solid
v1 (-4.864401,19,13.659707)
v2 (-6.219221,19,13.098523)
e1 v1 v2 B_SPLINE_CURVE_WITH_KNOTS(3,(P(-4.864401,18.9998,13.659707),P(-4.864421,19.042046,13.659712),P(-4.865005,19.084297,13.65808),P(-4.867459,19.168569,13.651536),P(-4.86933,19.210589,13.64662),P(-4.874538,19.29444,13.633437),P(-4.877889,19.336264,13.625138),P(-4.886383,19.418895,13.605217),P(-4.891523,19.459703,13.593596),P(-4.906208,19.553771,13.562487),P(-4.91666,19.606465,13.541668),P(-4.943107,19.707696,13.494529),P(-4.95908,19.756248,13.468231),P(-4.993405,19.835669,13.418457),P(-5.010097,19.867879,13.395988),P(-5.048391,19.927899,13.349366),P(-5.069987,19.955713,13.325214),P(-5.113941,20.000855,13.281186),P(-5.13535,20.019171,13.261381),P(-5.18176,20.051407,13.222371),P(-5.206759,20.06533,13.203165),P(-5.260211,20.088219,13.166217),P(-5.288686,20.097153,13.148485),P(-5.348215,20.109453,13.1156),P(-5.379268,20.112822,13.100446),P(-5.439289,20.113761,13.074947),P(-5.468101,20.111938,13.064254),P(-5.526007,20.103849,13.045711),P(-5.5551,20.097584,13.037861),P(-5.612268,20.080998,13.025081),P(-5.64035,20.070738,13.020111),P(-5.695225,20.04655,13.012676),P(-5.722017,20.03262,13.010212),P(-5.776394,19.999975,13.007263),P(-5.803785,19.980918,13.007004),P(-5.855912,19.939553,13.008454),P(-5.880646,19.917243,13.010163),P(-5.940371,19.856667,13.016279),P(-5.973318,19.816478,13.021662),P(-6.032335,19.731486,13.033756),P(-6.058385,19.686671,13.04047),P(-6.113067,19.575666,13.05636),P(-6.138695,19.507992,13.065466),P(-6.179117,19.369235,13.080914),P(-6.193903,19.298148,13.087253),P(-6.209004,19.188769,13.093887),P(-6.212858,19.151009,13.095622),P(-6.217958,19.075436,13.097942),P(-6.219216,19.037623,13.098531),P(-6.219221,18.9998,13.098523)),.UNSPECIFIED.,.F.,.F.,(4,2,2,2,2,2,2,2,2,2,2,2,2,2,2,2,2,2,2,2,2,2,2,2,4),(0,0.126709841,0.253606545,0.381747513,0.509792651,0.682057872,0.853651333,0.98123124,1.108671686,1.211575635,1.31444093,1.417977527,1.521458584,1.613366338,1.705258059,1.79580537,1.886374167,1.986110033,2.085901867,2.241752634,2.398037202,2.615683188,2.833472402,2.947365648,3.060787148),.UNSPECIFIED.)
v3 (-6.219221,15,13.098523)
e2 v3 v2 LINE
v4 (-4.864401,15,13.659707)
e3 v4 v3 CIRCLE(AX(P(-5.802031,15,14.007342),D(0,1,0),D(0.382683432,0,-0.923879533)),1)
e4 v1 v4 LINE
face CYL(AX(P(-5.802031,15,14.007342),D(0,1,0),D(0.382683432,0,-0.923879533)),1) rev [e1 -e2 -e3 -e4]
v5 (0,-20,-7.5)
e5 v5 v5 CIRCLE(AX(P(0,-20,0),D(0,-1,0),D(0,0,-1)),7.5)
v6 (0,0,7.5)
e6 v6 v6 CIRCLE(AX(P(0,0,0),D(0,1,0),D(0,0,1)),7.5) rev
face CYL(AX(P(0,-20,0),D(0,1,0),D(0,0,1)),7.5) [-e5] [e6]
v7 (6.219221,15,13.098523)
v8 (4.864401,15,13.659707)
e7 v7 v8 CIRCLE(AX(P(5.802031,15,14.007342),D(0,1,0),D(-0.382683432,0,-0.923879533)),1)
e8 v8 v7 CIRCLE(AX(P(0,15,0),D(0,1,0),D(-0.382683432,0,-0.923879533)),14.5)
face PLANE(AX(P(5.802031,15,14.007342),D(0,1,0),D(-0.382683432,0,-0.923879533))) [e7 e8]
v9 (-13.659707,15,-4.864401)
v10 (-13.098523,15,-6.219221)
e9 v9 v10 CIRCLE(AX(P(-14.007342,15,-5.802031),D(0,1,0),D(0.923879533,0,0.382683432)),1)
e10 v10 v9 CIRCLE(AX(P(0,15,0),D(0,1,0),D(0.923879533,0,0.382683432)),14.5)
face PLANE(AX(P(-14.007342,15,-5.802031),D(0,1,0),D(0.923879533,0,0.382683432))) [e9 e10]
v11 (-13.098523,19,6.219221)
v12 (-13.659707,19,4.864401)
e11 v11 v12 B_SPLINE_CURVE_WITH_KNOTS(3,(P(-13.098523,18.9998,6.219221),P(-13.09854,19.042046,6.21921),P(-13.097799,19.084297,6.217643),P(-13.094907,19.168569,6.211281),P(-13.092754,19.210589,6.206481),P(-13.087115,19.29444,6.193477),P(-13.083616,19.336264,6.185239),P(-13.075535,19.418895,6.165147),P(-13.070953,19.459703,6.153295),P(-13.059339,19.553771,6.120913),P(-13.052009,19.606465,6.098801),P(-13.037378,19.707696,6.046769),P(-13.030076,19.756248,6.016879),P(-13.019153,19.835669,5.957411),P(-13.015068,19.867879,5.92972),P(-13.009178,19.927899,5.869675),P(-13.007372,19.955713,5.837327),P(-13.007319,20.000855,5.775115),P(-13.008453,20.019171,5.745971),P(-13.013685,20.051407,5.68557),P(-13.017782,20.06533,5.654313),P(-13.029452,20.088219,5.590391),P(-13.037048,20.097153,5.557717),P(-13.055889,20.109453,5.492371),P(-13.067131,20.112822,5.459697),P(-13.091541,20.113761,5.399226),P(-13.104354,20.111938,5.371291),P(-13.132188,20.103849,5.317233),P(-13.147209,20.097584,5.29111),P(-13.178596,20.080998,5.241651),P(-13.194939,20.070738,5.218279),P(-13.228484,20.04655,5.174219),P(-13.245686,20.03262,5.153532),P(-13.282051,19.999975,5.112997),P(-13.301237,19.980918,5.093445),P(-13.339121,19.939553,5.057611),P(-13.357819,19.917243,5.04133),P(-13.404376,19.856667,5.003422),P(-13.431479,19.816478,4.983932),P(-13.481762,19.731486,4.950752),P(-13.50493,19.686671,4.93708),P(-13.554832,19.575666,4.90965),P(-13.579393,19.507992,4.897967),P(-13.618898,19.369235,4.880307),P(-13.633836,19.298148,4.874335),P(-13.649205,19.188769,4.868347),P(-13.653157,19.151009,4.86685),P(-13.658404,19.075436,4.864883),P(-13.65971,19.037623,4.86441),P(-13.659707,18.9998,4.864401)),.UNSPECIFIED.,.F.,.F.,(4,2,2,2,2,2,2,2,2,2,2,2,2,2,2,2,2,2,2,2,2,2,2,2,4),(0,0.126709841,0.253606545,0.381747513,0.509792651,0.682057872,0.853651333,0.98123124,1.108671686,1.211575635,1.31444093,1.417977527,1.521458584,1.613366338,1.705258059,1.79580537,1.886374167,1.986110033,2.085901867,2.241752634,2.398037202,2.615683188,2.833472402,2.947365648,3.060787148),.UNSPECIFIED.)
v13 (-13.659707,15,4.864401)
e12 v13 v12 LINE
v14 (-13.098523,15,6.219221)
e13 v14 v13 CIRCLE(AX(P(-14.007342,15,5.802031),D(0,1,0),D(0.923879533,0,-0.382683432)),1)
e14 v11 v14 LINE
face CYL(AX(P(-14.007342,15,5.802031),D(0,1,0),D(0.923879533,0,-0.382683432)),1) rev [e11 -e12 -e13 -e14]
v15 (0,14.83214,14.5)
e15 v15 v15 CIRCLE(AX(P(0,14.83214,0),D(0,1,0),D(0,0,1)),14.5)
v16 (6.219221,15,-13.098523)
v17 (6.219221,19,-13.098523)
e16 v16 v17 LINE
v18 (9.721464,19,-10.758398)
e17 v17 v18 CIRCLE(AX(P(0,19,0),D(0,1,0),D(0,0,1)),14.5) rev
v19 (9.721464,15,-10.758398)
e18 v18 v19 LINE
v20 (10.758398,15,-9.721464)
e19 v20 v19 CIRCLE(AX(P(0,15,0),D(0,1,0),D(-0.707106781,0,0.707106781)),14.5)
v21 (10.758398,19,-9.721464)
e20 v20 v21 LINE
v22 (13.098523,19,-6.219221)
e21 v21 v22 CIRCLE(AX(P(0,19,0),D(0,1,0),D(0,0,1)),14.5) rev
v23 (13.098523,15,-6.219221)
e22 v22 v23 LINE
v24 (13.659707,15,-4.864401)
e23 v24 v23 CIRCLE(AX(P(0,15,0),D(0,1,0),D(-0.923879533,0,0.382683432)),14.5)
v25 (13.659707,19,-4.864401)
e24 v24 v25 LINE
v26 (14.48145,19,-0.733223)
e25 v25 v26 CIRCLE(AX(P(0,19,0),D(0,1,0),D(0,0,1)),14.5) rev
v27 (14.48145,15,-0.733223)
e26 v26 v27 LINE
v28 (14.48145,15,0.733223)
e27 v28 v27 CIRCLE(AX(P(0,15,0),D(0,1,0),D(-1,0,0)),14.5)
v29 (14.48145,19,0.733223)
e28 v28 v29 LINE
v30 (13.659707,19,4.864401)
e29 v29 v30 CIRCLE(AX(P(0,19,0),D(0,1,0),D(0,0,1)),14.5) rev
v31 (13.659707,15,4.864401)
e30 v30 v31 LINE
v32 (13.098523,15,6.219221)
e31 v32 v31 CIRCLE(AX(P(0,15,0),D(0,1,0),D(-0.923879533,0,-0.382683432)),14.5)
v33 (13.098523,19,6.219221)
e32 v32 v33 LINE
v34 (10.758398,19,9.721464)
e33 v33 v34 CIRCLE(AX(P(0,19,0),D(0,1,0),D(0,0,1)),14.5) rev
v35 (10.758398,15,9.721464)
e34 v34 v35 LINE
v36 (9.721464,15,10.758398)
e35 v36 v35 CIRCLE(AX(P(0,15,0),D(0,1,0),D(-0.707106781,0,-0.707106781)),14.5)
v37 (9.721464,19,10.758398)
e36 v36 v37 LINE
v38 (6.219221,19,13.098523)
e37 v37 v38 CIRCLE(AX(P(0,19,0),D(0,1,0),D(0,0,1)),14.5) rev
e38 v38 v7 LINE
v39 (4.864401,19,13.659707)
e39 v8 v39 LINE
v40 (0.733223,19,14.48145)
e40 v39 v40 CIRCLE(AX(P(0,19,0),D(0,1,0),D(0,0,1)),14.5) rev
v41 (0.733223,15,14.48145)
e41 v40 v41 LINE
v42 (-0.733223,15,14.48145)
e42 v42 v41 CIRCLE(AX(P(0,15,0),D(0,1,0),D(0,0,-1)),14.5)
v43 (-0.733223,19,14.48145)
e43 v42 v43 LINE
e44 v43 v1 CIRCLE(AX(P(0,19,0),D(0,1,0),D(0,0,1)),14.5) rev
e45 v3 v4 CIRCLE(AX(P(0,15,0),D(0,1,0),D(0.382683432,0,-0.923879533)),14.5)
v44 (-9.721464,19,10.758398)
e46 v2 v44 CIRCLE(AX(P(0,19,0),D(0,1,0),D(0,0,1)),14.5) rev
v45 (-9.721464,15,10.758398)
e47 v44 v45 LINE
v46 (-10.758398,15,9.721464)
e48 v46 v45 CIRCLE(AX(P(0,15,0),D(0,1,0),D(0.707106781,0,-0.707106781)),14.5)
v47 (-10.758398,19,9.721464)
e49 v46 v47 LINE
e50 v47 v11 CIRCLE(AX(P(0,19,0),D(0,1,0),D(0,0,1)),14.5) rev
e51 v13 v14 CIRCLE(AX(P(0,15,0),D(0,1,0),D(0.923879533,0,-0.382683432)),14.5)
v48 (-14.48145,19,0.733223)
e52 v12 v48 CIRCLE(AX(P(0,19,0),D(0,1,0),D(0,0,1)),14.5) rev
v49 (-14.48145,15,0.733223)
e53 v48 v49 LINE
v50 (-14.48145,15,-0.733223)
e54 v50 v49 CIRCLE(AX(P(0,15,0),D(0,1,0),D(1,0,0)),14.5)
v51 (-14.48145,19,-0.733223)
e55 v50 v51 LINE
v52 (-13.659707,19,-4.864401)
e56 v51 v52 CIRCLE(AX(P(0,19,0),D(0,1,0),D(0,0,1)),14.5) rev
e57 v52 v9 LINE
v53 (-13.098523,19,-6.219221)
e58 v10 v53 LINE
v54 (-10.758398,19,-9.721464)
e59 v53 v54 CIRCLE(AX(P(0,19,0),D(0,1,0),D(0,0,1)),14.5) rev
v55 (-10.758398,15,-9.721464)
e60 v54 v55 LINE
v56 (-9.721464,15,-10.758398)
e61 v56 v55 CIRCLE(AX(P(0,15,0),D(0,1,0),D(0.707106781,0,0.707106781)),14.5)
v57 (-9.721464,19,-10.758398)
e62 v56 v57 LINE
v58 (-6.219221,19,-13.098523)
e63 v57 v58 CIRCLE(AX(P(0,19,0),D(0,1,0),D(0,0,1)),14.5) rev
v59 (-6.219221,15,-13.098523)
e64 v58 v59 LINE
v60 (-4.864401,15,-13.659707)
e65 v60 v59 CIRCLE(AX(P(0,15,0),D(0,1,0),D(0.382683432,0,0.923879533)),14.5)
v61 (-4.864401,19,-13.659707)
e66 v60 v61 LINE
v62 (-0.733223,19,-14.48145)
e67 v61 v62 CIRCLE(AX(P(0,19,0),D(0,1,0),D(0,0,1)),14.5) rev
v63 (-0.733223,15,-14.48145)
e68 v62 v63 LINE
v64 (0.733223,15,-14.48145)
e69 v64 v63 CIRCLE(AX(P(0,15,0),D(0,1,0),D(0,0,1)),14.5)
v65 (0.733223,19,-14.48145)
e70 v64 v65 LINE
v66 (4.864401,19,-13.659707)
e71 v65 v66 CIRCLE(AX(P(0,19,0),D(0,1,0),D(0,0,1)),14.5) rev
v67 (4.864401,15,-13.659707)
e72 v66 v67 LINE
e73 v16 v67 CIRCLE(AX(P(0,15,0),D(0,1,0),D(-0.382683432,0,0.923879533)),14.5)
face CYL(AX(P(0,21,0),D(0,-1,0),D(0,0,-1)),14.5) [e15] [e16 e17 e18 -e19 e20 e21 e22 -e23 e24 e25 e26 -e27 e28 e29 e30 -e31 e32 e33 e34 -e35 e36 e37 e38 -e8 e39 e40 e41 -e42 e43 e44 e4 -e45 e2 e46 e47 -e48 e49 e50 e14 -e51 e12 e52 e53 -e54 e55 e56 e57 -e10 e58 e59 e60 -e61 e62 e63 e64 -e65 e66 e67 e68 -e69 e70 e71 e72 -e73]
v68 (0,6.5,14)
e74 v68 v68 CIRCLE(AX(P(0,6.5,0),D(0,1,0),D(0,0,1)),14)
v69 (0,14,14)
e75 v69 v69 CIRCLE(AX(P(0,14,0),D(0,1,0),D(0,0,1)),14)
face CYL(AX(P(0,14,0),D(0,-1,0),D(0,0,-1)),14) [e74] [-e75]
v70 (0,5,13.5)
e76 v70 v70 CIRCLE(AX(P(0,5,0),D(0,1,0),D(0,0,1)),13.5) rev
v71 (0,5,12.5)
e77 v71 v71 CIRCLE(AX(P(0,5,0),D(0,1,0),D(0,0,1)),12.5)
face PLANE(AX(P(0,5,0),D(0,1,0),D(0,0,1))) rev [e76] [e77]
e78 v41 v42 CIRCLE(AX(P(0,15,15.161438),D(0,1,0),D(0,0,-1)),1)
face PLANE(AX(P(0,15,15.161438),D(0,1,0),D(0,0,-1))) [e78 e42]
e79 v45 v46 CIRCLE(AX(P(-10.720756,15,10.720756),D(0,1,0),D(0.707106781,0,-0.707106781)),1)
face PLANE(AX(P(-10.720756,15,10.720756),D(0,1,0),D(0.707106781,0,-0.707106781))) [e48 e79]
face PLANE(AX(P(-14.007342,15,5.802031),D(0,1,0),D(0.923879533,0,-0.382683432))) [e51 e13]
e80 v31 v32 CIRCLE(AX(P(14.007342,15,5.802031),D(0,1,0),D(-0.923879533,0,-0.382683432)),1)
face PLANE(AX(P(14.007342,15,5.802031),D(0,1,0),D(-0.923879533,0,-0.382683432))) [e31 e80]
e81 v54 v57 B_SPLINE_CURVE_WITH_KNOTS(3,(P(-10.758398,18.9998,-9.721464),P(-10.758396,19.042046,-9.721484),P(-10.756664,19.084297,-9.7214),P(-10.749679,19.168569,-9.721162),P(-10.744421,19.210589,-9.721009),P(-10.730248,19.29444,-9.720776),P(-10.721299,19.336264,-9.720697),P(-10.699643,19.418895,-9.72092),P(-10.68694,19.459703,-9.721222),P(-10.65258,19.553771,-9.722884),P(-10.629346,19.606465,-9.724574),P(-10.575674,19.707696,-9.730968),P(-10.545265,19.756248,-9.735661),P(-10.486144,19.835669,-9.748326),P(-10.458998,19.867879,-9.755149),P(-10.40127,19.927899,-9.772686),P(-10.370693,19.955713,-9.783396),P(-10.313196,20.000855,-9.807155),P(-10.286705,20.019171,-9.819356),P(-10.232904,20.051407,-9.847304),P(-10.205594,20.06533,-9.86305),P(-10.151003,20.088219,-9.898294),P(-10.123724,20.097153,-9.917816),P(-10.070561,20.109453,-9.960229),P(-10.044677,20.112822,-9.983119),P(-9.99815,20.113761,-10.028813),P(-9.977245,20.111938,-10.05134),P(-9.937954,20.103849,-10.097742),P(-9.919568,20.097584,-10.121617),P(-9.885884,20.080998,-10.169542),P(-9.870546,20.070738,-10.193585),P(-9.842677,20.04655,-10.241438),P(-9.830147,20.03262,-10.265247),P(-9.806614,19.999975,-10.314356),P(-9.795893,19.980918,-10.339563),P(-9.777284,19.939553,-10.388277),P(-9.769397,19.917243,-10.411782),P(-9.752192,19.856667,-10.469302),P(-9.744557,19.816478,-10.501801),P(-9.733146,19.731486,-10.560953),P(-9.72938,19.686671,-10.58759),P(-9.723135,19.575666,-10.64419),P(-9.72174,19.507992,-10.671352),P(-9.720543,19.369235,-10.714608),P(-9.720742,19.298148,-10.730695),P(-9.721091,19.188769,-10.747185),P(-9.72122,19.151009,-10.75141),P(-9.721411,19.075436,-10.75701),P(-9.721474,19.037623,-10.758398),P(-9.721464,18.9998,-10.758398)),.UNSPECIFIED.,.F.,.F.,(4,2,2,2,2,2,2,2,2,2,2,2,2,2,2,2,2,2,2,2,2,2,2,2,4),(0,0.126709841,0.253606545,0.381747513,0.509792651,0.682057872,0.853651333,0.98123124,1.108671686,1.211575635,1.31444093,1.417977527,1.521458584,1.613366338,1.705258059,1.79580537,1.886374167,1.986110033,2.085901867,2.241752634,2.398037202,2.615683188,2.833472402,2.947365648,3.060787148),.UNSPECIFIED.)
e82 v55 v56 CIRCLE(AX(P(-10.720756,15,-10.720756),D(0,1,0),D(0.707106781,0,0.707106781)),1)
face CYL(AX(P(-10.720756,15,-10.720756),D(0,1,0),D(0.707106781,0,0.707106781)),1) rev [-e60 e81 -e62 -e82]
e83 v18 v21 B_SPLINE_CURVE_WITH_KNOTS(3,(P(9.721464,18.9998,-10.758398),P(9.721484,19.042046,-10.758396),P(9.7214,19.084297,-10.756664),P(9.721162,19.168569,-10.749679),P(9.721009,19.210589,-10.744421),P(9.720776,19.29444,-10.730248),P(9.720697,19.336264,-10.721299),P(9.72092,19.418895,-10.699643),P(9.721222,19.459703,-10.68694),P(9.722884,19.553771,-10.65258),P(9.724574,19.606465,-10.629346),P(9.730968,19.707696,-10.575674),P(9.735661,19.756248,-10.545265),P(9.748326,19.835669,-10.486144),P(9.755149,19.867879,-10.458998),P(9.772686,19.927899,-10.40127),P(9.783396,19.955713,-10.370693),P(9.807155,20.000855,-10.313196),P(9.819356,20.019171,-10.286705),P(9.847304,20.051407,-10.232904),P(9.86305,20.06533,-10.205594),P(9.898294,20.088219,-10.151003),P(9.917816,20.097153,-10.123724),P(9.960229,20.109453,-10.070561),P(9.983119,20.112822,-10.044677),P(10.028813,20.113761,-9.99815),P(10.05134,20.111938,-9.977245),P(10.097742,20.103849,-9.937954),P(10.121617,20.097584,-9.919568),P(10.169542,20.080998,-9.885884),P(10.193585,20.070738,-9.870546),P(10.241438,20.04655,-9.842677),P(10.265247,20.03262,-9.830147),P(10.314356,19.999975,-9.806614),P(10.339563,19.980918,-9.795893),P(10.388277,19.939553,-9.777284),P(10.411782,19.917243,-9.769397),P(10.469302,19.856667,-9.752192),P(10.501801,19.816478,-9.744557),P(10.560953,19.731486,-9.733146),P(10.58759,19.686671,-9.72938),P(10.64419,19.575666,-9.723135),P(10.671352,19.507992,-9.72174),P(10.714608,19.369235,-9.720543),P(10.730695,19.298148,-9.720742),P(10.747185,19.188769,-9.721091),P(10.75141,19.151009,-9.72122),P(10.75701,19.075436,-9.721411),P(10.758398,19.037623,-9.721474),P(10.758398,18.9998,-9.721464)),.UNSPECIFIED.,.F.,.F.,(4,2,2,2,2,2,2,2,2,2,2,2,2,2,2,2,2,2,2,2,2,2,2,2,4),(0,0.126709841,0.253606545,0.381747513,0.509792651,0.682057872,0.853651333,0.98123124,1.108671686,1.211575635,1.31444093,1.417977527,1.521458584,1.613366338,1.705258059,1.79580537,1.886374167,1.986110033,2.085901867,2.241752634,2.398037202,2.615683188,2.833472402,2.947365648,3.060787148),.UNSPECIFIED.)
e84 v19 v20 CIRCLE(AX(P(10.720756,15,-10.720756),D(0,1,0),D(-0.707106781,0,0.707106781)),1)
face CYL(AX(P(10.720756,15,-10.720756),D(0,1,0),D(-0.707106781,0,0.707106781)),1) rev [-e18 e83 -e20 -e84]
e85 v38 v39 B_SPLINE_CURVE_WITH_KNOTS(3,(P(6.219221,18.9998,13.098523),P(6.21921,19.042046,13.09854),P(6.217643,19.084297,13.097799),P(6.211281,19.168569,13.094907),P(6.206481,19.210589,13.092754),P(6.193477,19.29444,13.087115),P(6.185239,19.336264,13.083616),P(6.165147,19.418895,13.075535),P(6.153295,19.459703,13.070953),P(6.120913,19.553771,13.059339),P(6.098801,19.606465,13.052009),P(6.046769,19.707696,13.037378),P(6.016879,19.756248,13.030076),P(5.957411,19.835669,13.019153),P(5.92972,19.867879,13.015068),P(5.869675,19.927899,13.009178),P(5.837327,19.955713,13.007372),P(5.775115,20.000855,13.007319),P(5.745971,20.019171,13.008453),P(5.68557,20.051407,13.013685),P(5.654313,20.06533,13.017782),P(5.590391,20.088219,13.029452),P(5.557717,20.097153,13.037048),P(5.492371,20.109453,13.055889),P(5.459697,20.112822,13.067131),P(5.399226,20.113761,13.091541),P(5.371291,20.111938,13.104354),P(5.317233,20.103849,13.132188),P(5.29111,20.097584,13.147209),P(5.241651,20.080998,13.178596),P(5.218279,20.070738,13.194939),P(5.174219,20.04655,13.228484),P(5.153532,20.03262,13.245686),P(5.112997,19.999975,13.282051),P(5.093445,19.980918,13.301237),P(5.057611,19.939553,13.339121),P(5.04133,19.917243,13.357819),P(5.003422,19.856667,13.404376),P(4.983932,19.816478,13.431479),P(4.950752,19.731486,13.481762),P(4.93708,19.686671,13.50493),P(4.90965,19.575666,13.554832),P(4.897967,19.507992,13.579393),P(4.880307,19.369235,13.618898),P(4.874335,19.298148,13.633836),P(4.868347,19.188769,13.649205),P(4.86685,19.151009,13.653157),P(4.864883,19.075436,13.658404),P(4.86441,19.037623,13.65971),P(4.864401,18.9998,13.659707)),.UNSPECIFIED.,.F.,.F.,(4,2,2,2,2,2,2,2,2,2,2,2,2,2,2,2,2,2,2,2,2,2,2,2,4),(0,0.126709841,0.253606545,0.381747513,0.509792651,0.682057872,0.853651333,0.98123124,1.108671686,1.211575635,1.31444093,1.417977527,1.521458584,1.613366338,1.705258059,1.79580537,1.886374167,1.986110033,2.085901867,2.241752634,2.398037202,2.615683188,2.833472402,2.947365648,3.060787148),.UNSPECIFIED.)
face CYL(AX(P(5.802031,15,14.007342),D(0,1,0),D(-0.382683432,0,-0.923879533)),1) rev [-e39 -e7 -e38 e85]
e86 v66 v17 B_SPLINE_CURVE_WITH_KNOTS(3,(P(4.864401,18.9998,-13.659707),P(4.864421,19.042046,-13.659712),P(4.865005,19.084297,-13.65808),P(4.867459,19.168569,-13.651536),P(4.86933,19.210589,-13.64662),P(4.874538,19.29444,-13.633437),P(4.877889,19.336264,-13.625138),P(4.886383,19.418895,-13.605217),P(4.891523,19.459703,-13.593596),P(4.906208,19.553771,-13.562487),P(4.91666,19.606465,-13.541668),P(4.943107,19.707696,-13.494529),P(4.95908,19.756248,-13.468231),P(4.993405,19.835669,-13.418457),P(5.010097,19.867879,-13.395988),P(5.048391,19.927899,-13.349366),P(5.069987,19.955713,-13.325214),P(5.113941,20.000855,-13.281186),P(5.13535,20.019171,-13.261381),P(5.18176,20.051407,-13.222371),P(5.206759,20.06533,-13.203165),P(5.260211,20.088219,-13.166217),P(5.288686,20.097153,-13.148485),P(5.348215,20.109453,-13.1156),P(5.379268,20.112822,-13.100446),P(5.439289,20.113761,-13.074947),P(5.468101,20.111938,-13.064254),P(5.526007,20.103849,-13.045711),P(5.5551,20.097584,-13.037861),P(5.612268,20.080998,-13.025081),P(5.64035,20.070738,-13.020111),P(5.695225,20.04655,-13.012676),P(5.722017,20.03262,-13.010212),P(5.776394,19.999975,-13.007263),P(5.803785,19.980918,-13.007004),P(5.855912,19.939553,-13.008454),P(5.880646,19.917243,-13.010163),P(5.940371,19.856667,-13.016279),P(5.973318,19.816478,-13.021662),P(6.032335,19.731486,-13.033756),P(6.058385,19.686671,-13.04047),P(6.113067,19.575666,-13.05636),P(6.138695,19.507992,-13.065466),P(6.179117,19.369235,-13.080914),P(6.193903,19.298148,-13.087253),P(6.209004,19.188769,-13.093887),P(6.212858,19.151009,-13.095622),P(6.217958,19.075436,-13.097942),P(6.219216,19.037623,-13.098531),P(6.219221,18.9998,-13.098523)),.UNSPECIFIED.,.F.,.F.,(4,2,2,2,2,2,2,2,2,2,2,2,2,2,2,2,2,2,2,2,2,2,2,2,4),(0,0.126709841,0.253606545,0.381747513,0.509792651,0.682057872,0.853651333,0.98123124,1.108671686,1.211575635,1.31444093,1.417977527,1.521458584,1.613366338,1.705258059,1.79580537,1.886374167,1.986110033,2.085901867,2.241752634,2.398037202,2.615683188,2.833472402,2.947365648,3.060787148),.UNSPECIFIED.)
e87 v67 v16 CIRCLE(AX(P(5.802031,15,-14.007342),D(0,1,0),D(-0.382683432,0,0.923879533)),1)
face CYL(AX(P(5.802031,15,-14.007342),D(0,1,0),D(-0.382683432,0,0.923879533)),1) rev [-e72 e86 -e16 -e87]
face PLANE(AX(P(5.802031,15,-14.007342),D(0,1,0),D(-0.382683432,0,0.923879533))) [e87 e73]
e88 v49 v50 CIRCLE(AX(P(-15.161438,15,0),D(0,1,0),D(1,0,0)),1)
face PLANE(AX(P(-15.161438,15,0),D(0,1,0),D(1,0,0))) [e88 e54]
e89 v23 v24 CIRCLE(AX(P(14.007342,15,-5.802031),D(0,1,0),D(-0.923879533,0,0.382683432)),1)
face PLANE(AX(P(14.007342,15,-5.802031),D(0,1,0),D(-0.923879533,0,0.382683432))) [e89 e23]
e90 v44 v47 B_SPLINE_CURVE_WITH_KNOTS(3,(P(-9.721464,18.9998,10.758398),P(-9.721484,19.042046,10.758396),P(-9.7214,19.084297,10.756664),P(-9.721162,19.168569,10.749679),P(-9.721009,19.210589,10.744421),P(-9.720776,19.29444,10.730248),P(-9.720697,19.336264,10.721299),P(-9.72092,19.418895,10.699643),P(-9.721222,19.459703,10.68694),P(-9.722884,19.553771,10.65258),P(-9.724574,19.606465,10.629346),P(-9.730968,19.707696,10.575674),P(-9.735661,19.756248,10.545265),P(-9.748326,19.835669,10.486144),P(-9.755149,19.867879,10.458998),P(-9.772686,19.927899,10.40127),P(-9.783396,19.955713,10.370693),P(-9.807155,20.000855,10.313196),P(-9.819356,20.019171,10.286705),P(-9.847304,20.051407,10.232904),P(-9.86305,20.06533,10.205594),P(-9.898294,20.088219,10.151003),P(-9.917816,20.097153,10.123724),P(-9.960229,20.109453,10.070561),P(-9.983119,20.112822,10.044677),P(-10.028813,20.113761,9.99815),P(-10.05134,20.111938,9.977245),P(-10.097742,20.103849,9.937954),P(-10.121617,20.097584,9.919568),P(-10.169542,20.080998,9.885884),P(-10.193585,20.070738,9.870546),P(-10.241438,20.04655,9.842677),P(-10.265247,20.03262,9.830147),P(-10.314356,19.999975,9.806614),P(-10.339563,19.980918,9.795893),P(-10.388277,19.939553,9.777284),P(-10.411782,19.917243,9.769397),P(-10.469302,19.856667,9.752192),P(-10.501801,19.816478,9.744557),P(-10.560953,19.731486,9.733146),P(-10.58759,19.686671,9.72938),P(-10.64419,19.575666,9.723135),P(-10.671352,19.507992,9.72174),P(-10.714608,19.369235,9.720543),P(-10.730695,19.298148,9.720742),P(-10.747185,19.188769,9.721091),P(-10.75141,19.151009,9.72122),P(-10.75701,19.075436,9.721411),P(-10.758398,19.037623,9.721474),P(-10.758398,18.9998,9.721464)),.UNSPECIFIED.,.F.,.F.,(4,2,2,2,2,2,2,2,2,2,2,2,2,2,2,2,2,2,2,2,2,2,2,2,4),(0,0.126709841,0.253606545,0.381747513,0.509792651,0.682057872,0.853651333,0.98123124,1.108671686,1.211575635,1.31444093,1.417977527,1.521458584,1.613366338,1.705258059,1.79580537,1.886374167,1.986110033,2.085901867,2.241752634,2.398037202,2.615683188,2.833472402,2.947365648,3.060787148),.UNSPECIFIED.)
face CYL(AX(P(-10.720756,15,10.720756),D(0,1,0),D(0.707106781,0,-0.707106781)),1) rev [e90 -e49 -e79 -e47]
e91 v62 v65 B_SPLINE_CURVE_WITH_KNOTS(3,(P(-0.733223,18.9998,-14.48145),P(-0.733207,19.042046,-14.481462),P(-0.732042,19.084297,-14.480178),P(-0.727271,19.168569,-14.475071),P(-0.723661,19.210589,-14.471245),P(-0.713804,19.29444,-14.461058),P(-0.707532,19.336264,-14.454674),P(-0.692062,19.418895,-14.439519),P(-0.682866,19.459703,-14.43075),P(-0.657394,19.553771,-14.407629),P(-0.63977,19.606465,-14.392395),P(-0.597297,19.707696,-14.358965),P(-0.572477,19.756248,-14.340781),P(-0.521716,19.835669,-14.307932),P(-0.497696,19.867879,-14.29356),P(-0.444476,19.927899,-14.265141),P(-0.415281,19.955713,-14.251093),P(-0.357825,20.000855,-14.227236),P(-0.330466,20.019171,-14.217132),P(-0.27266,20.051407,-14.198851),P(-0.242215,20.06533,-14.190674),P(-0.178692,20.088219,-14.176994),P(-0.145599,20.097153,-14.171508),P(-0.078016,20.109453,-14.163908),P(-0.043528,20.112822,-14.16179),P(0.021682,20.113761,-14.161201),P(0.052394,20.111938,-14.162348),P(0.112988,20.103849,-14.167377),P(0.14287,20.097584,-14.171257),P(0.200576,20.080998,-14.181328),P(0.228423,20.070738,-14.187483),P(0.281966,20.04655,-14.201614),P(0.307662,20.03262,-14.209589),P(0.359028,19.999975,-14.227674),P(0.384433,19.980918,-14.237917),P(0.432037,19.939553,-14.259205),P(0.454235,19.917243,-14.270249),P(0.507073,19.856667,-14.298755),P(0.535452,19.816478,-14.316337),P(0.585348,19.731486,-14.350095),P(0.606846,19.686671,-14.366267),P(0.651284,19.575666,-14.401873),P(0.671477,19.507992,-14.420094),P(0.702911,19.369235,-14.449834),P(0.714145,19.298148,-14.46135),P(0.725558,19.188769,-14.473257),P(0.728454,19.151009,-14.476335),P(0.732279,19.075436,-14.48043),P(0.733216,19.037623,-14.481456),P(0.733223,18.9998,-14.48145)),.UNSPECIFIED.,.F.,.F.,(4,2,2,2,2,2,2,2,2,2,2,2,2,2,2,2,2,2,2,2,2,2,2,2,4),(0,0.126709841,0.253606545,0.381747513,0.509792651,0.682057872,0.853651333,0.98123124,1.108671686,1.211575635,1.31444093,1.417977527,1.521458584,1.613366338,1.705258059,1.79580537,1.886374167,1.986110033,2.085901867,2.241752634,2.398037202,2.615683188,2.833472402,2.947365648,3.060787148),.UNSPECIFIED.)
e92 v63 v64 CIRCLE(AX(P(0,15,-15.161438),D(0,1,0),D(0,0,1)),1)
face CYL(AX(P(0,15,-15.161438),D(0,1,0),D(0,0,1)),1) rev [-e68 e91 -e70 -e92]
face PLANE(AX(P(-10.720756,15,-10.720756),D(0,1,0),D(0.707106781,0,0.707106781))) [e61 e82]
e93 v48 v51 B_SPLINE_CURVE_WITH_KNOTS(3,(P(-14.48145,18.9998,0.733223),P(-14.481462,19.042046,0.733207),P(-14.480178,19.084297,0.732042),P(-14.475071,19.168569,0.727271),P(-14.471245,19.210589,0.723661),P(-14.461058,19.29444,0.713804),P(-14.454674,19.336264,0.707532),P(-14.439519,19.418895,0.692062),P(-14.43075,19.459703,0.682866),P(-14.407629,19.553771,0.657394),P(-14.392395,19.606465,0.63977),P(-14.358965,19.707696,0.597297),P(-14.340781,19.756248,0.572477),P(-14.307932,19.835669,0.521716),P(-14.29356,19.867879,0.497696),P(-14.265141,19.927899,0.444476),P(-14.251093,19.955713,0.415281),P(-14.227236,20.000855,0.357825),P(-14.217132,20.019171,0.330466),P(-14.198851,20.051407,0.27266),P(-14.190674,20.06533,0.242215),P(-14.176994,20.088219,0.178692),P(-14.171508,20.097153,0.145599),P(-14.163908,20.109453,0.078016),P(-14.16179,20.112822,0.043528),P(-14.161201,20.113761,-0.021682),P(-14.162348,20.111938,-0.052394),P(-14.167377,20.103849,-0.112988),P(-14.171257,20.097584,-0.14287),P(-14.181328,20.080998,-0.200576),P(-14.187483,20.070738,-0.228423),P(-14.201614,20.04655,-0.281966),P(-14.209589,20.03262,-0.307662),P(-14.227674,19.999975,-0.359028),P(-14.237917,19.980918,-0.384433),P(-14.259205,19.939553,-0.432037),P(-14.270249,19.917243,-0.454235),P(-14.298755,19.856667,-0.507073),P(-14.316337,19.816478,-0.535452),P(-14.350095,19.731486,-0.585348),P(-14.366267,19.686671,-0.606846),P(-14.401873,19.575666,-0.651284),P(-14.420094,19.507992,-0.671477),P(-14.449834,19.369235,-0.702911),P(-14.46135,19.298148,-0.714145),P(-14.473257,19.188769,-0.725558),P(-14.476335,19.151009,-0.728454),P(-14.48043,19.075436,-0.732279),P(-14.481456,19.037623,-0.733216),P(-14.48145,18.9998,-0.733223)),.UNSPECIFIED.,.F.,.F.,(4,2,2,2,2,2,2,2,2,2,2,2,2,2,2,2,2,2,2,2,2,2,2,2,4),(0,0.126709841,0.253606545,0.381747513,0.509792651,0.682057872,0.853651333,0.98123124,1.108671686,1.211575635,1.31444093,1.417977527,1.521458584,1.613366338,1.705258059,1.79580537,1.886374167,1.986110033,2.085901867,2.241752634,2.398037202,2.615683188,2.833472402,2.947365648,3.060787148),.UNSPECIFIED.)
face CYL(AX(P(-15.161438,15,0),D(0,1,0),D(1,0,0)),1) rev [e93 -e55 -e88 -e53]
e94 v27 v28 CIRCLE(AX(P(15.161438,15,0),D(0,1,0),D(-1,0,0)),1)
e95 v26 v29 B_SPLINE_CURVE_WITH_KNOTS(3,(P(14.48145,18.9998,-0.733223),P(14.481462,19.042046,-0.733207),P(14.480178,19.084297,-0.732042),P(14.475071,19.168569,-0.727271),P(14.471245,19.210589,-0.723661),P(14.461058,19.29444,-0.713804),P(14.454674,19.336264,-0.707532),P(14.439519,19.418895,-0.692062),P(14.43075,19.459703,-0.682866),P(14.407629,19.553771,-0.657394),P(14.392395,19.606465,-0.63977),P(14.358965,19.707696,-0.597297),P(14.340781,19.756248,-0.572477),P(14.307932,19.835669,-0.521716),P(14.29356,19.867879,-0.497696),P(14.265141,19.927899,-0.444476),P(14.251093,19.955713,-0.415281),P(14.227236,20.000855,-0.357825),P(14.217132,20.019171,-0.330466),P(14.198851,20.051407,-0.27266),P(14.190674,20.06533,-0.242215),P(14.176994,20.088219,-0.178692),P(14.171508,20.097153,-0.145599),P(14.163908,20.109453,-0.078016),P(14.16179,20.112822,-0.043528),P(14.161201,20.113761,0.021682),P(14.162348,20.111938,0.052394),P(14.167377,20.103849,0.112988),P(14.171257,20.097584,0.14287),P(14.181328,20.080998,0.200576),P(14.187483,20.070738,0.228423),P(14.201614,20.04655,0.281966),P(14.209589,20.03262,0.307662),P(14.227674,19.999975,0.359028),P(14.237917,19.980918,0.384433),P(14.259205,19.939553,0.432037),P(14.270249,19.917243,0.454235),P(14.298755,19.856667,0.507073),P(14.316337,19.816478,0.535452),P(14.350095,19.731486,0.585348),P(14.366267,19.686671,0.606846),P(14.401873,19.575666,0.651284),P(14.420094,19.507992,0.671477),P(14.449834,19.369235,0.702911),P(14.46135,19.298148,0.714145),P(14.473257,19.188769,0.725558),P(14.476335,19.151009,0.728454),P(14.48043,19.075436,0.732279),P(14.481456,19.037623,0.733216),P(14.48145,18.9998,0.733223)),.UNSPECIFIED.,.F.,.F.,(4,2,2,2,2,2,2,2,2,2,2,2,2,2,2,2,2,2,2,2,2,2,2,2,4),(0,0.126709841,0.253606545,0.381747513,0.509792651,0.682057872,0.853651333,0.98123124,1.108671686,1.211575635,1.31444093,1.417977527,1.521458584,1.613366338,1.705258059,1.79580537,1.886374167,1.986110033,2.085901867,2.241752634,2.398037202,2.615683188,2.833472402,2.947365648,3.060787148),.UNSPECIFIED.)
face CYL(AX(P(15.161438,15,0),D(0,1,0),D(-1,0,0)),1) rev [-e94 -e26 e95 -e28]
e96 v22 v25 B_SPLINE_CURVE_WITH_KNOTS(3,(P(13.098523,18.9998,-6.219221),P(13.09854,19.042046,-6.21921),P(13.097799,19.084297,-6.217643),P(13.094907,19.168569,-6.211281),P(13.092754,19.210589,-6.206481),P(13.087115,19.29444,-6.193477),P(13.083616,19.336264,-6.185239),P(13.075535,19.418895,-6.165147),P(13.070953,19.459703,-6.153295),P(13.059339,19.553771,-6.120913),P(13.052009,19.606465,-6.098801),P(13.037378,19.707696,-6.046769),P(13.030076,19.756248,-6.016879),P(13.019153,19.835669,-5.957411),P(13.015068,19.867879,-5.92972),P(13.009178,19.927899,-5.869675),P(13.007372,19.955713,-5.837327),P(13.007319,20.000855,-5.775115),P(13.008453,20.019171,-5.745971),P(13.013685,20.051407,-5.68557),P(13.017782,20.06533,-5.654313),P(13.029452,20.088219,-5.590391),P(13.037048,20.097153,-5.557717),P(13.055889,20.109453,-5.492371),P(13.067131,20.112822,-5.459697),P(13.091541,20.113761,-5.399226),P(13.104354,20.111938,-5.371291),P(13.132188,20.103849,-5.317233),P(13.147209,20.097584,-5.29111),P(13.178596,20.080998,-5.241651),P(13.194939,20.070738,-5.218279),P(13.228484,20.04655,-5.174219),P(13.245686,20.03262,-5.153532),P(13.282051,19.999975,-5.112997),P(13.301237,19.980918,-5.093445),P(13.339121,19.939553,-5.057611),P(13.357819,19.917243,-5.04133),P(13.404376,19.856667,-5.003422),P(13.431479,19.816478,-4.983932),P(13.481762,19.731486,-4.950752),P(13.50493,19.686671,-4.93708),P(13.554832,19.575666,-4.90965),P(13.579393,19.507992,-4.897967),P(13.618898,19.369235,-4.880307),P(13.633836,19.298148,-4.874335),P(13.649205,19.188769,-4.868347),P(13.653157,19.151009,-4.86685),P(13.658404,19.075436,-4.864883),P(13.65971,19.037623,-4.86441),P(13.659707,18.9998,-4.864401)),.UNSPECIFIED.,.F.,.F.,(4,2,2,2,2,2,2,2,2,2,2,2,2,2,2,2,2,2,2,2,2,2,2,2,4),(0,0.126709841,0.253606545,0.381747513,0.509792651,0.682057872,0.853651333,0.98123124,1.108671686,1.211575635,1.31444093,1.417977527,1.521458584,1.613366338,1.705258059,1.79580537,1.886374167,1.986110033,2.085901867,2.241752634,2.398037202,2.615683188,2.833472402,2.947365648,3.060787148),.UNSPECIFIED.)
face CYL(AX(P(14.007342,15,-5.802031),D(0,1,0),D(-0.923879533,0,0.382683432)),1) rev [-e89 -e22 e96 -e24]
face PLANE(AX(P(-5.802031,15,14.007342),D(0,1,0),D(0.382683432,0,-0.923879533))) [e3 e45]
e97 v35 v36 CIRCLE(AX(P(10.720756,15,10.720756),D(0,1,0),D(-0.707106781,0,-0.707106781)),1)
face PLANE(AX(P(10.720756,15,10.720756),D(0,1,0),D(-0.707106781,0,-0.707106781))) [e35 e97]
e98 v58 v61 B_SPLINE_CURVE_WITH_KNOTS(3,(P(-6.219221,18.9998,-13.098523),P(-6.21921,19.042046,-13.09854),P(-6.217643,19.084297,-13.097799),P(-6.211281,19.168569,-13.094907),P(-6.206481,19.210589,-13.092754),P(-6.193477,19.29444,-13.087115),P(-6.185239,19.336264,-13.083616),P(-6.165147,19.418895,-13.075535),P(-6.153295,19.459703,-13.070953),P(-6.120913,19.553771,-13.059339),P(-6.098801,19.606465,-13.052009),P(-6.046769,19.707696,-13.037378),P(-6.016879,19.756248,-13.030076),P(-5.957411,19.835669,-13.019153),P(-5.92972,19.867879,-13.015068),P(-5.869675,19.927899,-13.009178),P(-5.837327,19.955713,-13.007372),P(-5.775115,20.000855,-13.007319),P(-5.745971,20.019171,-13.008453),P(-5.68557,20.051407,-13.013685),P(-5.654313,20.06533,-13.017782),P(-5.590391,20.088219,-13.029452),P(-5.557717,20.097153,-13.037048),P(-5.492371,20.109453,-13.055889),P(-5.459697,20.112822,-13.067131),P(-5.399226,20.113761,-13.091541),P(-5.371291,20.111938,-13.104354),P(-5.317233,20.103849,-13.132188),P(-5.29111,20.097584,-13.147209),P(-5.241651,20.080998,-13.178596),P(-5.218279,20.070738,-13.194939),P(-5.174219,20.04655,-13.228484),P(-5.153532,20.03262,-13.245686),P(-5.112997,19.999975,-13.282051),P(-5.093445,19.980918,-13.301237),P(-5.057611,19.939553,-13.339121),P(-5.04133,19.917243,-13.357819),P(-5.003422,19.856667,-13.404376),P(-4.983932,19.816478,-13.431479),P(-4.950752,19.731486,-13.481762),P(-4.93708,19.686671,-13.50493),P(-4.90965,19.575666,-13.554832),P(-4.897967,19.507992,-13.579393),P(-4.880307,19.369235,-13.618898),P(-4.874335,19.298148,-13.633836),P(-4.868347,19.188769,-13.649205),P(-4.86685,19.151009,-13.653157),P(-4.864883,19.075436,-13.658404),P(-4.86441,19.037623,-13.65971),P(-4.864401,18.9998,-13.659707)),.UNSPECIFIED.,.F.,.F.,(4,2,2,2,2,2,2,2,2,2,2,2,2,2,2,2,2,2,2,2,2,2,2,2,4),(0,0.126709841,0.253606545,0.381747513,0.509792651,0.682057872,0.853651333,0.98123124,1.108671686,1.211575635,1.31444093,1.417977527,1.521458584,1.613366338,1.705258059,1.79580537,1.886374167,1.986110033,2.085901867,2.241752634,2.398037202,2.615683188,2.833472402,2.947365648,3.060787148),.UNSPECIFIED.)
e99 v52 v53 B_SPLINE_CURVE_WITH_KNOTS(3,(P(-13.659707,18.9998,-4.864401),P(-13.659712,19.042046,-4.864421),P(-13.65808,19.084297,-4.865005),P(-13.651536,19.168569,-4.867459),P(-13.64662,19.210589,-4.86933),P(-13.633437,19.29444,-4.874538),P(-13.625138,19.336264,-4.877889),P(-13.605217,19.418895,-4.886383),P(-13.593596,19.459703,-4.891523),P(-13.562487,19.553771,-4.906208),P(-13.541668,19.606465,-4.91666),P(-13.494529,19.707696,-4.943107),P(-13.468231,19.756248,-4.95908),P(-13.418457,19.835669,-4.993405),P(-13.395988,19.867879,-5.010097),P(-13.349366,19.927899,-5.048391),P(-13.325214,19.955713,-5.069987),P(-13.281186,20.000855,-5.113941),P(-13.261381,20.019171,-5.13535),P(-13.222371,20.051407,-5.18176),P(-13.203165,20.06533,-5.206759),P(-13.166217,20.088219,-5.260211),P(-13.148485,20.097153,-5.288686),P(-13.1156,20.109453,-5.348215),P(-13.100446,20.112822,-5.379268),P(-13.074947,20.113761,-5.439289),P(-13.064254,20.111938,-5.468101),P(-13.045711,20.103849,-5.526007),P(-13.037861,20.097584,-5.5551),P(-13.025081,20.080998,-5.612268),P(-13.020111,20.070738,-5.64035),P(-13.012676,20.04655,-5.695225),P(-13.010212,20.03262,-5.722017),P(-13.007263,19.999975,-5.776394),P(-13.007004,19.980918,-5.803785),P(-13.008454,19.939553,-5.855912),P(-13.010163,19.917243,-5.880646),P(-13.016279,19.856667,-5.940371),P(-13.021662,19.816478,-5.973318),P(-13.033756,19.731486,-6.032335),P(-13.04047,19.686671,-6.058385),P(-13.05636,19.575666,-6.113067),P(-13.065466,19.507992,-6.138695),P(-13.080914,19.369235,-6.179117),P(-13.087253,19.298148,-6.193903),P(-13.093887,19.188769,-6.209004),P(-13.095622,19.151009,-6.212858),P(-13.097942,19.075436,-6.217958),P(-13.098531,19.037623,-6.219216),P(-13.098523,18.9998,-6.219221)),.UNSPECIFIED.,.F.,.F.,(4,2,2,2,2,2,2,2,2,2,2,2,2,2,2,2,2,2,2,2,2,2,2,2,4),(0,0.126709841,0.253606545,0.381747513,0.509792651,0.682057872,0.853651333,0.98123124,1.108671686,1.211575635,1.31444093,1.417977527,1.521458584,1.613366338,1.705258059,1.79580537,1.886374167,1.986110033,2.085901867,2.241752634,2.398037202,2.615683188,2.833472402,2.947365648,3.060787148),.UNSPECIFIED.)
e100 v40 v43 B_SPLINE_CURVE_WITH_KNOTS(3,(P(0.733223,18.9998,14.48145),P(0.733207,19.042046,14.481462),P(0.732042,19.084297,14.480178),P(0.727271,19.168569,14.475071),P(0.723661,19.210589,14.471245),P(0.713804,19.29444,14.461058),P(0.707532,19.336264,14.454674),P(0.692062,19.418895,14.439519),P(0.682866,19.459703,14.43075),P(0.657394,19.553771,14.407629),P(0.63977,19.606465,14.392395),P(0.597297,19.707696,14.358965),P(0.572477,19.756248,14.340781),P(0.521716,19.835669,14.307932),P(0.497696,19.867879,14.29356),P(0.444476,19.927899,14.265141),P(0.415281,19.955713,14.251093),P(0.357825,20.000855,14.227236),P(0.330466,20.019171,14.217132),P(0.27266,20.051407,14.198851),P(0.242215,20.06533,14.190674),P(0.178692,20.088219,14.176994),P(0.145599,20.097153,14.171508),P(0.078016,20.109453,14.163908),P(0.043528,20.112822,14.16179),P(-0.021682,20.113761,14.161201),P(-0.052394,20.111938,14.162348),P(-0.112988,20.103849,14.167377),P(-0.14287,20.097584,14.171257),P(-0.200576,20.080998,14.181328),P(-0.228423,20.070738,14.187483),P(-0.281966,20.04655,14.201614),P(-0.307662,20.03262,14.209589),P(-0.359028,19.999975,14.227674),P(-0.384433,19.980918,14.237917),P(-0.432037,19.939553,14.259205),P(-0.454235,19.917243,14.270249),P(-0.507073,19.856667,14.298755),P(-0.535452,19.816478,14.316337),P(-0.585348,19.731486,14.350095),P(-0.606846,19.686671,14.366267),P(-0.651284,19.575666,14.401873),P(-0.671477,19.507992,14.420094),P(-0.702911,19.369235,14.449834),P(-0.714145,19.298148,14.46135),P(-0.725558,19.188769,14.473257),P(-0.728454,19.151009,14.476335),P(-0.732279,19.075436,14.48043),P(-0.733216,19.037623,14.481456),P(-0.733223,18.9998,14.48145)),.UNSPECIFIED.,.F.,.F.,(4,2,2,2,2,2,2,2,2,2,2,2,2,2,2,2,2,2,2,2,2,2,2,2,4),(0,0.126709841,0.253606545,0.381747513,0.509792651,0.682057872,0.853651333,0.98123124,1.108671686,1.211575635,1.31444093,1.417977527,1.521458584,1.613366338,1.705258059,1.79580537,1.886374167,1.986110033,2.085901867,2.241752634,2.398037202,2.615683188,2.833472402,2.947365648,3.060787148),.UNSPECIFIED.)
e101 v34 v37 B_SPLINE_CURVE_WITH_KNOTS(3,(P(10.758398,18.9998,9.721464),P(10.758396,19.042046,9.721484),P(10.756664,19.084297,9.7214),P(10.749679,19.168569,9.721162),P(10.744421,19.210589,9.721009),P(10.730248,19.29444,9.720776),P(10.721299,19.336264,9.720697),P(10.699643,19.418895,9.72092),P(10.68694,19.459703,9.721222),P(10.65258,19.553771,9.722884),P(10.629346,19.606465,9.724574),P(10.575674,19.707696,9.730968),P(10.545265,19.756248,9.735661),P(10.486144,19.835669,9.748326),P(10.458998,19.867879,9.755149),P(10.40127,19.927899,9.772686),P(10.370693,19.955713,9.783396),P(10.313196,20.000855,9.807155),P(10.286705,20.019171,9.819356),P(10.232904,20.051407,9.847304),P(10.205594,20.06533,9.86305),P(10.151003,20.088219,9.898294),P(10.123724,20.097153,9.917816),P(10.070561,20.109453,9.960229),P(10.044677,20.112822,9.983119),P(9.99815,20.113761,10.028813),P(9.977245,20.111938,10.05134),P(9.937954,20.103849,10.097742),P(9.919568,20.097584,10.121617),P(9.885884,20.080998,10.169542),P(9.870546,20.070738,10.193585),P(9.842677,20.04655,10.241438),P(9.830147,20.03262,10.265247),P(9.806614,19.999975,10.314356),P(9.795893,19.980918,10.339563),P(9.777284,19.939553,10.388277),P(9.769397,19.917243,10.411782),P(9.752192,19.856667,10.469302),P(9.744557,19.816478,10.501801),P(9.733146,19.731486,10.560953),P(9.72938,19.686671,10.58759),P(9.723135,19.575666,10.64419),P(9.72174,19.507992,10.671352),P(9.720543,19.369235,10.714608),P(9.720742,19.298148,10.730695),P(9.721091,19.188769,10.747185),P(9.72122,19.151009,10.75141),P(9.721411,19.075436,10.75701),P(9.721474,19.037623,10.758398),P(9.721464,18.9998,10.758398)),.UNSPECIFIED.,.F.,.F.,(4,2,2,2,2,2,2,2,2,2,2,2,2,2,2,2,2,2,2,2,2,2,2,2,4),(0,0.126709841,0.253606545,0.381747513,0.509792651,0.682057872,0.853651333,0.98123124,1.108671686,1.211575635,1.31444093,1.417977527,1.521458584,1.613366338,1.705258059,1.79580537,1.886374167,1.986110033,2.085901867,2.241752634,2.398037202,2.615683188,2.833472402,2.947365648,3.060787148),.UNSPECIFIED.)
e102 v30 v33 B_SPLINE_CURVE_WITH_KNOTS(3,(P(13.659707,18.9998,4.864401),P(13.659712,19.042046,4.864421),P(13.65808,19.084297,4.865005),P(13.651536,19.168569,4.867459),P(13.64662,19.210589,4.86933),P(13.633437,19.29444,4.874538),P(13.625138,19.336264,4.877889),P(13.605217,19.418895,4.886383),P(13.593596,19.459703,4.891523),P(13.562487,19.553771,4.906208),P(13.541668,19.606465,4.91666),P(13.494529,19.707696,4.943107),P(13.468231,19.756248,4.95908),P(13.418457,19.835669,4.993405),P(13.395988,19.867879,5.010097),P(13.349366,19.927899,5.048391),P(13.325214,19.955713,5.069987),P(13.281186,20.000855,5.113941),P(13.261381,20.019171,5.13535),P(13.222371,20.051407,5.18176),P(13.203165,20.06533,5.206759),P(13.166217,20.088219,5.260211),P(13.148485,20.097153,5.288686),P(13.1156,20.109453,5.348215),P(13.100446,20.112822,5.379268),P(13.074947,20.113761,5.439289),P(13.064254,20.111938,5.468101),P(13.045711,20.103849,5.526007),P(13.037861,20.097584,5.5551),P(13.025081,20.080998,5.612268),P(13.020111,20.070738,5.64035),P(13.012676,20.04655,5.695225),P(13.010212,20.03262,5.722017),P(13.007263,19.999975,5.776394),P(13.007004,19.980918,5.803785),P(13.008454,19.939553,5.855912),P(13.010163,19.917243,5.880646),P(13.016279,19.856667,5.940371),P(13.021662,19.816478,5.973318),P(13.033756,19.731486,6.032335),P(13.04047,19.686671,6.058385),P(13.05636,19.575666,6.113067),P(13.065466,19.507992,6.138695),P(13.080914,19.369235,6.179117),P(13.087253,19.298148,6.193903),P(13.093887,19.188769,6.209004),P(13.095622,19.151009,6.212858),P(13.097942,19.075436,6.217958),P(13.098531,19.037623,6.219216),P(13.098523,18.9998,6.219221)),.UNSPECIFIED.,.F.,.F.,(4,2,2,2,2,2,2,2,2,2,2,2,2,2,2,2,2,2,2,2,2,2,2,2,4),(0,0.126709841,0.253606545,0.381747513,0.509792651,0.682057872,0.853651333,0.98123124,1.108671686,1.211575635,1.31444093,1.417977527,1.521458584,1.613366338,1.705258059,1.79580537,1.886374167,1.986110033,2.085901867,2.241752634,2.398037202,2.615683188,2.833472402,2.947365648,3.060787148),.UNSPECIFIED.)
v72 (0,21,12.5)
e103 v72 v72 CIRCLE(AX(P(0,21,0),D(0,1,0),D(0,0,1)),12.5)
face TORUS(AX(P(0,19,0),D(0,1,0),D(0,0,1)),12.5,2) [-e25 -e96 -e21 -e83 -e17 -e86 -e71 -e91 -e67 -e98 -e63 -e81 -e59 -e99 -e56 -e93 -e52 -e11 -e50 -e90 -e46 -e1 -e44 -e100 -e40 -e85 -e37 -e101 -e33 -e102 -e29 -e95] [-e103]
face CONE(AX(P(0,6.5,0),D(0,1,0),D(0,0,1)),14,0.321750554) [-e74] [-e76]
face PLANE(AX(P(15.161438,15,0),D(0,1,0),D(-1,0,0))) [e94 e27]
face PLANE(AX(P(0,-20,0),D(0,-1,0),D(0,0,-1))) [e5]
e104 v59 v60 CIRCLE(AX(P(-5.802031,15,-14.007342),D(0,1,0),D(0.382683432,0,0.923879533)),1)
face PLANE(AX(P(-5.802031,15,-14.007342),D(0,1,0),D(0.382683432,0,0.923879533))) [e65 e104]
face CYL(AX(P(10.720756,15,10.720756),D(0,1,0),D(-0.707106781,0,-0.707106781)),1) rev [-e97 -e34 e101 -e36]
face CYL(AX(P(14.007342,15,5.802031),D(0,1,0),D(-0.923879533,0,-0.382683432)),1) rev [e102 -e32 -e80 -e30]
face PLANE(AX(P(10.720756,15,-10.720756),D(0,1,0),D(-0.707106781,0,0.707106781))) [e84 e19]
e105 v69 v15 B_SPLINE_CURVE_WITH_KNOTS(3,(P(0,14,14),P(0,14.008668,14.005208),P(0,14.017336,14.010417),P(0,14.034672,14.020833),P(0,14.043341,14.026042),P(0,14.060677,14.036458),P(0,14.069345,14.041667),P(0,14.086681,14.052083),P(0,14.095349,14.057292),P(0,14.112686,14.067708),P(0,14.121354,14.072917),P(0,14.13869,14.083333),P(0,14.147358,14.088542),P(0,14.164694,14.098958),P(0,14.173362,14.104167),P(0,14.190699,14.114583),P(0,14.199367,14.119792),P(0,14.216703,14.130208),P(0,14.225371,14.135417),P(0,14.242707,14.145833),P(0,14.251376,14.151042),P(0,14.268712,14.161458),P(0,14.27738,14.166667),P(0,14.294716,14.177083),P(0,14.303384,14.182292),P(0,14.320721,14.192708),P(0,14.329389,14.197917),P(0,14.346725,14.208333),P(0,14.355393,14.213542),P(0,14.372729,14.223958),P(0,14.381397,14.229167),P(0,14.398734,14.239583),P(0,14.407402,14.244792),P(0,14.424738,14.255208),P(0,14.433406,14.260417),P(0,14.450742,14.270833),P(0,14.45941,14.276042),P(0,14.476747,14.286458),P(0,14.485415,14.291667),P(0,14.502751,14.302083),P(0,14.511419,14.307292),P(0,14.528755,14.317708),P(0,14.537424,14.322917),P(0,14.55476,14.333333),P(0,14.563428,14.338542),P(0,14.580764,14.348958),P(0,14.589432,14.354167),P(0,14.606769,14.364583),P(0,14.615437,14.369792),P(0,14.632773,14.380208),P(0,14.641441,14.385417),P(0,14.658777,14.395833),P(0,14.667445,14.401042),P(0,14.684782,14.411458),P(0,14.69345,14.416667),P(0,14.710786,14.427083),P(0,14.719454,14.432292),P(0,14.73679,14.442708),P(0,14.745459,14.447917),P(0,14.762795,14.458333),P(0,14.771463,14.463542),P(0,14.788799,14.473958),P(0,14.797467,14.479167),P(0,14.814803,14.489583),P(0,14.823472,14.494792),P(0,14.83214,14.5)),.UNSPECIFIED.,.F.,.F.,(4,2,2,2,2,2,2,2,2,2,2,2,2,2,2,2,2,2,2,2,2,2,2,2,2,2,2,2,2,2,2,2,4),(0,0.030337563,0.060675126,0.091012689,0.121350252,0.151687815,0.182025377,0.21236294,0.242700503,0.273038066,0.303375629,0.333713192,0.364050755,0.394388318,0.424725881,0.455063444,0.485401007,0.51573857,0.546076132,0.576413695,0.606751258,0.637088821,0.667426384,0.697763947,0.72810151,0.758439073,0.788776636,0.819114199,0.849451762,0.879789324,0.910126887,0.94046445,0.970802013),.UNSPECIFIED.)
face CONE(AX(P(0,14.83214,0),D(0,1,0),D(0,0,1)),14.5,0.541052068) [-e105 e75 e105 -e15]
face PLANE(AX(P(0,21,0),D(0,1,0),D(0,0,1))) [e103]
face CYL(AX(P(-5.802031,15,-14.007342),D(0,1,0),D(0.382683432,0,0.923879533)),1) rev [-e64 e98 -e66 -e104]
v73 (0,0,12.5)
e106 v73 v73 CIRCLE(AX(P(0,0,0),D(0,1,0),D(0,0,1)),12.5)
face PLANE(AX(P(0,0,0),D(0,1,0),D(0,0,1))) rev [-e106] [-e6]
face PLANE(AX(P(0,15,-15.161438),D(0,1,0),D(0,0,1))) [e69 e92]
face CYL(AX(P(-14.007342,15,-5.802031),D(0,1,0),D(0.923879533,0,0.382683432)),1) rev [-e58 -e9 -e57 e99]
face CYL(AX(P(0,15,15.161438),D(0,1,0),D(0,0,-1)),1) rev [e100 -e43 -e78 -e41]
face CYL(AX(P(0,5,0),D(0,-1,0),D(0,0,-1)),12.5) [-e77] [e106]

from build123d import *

# Parameters (mm, degrees)
SKETCH1_R           = 12.5
BOSS_EXTRUDE1_DEPTH = 5
SKETCH2_R           = 7.5
BOSS_EXTRUDE2_DEPTH = 20
SKETCH3_R           = 14
BOSS_EXTRUDE3_DEPTH = 9
CHAMFER1_SIZE       = 0.5
CHAMFER1_SIZE2      = 1.5
SKETCH4_R           = 14.5
BOSS_EXTRUDE4_DEPTH = 7
FILLET3_R           = 2
CHAMFER2_SIZE2      = 0.5
CHAMFER2_SIZE       = 0.832139741
CUT_EXTRUDE2_DEPTH  = 6
CIRPATTERN1_COUNT   = 16


with BuildPart() as part:
    # Sketch1 → Boss-Extrude1 (new body)
    with BuildSketch(Plane(origin=(0, 0, 0), x_dir=(1, 0, 0), z_dir=(0, 1, 0))):
        with Locations(Location((0, 0, 0), (0, 0, 270))):
            Circle(SKETCH1_R)
    extrude(amount=BOSS_EXTRUDE1_DEPTH)

    # Sketch2 → Boss-Extrude2 (add)
    with BuildSketch(Plane.XZ):
        with Locations(Location((0, 0, 0), (0, 0, 90))):
            Circle(SKETCH2_R)
    extrude(amount=BOSS_EXTRUDE2_DEPTH)

    # Sketch3 → Boss-Extrude3 (add)
    with BuildSketch(Plane(origin=(0, 5, 0), x_dir=(1, 0, 0), z_dir=(0, 1, 0))):
        with Locations(Location((0, 0, 0), (0, 0, 270))):
            Circle(SKETCH3_R)
    extrude(amount=BOSS_EXTRUDE3_DEPTH)

    # Chamfer1
    chamfer1_edges = [part.edges().sort_by_distance(p)[0] for p in [
        (0, 5, -14),
    ]]
    chamfer1_side = [part.faces().sort_by_distance(p)[0] for p in [
        (0, 5, -13.604020203),
    ]]
    chamfer(chamfer1_edges, length=CHAMFER1_SIZE, length2=CHAMFER1_SIZE2, reference=chamfer1_side[0])

    # Sketch4 → Boss-Extrude4 (add)
    with BuildSketch(Plane(origin=(0, 14, 0), x_dir=(1, 0, 0), z_dir=(0, 1, 0))):
        with Locations(Location((0, 0, 0), (0, 0, 270))):
            Circle(SKETCH4_R)
    extrude(amount=BOSS_EXTRUDE4_DEPTH)

    # Fillet3
    fillet3_edges = [part.edges().sort_by_distance(p)[0] for p in [
        (0, 21, -14.5),
    ]]
    fillet(fillet3_edges, radius=FILLET3_R)

    # Chamfer2
    chamfer2_edges = [part.edges().sort_by_distance(p)[0] for p in [
        (0, 14, -14.5),
    ]]
    chamfer2_side = [part.faces().sort_by_distance(p)[0] for p in [
        (0, 14.01, -14.5),
    ]]
    chamfer(chamfer2_edges, length=CHAMFER2_SIZE - 0.0001, length2=CHAMFER2_SIZE2 - 0.0001, reference=chamfer2_side[0])  # a hair under: the kernel refuses the full size

    # Sketch5 → Cut-Extrude2 (cut)
    with BuildSketch(Plane(origin=(0, 21, 0), x_dir=(1, 0, 0), z_dir=(0, 1, 0))):
        with BuildLine():
            Line((-0.75, 14.5), (0.75, 14.5))
            ThreePointArc((0.75, 14.5), (0, 14.161437828), (-0.75, 14.5))
        make_face()
    cut_extrude2 = extrude(amount=-CUT_EXTRUDE2_DEPTH, mode=Mode.SUBTRACT)

    # CirPattern1: Cut-Extrude2 ×16 about axis
    cirpattern1_axis = Axis((0, 0, 0), (0, 1, 0))
    for i in range(1, CIRPATTERN1_COUNT):
        add(cut_extrude2.rotate(cirpattern1_axis, i * 360 / CIRPATTERN1_COUNT), mode=Mode.SUBTRACT)


solid = part.part
